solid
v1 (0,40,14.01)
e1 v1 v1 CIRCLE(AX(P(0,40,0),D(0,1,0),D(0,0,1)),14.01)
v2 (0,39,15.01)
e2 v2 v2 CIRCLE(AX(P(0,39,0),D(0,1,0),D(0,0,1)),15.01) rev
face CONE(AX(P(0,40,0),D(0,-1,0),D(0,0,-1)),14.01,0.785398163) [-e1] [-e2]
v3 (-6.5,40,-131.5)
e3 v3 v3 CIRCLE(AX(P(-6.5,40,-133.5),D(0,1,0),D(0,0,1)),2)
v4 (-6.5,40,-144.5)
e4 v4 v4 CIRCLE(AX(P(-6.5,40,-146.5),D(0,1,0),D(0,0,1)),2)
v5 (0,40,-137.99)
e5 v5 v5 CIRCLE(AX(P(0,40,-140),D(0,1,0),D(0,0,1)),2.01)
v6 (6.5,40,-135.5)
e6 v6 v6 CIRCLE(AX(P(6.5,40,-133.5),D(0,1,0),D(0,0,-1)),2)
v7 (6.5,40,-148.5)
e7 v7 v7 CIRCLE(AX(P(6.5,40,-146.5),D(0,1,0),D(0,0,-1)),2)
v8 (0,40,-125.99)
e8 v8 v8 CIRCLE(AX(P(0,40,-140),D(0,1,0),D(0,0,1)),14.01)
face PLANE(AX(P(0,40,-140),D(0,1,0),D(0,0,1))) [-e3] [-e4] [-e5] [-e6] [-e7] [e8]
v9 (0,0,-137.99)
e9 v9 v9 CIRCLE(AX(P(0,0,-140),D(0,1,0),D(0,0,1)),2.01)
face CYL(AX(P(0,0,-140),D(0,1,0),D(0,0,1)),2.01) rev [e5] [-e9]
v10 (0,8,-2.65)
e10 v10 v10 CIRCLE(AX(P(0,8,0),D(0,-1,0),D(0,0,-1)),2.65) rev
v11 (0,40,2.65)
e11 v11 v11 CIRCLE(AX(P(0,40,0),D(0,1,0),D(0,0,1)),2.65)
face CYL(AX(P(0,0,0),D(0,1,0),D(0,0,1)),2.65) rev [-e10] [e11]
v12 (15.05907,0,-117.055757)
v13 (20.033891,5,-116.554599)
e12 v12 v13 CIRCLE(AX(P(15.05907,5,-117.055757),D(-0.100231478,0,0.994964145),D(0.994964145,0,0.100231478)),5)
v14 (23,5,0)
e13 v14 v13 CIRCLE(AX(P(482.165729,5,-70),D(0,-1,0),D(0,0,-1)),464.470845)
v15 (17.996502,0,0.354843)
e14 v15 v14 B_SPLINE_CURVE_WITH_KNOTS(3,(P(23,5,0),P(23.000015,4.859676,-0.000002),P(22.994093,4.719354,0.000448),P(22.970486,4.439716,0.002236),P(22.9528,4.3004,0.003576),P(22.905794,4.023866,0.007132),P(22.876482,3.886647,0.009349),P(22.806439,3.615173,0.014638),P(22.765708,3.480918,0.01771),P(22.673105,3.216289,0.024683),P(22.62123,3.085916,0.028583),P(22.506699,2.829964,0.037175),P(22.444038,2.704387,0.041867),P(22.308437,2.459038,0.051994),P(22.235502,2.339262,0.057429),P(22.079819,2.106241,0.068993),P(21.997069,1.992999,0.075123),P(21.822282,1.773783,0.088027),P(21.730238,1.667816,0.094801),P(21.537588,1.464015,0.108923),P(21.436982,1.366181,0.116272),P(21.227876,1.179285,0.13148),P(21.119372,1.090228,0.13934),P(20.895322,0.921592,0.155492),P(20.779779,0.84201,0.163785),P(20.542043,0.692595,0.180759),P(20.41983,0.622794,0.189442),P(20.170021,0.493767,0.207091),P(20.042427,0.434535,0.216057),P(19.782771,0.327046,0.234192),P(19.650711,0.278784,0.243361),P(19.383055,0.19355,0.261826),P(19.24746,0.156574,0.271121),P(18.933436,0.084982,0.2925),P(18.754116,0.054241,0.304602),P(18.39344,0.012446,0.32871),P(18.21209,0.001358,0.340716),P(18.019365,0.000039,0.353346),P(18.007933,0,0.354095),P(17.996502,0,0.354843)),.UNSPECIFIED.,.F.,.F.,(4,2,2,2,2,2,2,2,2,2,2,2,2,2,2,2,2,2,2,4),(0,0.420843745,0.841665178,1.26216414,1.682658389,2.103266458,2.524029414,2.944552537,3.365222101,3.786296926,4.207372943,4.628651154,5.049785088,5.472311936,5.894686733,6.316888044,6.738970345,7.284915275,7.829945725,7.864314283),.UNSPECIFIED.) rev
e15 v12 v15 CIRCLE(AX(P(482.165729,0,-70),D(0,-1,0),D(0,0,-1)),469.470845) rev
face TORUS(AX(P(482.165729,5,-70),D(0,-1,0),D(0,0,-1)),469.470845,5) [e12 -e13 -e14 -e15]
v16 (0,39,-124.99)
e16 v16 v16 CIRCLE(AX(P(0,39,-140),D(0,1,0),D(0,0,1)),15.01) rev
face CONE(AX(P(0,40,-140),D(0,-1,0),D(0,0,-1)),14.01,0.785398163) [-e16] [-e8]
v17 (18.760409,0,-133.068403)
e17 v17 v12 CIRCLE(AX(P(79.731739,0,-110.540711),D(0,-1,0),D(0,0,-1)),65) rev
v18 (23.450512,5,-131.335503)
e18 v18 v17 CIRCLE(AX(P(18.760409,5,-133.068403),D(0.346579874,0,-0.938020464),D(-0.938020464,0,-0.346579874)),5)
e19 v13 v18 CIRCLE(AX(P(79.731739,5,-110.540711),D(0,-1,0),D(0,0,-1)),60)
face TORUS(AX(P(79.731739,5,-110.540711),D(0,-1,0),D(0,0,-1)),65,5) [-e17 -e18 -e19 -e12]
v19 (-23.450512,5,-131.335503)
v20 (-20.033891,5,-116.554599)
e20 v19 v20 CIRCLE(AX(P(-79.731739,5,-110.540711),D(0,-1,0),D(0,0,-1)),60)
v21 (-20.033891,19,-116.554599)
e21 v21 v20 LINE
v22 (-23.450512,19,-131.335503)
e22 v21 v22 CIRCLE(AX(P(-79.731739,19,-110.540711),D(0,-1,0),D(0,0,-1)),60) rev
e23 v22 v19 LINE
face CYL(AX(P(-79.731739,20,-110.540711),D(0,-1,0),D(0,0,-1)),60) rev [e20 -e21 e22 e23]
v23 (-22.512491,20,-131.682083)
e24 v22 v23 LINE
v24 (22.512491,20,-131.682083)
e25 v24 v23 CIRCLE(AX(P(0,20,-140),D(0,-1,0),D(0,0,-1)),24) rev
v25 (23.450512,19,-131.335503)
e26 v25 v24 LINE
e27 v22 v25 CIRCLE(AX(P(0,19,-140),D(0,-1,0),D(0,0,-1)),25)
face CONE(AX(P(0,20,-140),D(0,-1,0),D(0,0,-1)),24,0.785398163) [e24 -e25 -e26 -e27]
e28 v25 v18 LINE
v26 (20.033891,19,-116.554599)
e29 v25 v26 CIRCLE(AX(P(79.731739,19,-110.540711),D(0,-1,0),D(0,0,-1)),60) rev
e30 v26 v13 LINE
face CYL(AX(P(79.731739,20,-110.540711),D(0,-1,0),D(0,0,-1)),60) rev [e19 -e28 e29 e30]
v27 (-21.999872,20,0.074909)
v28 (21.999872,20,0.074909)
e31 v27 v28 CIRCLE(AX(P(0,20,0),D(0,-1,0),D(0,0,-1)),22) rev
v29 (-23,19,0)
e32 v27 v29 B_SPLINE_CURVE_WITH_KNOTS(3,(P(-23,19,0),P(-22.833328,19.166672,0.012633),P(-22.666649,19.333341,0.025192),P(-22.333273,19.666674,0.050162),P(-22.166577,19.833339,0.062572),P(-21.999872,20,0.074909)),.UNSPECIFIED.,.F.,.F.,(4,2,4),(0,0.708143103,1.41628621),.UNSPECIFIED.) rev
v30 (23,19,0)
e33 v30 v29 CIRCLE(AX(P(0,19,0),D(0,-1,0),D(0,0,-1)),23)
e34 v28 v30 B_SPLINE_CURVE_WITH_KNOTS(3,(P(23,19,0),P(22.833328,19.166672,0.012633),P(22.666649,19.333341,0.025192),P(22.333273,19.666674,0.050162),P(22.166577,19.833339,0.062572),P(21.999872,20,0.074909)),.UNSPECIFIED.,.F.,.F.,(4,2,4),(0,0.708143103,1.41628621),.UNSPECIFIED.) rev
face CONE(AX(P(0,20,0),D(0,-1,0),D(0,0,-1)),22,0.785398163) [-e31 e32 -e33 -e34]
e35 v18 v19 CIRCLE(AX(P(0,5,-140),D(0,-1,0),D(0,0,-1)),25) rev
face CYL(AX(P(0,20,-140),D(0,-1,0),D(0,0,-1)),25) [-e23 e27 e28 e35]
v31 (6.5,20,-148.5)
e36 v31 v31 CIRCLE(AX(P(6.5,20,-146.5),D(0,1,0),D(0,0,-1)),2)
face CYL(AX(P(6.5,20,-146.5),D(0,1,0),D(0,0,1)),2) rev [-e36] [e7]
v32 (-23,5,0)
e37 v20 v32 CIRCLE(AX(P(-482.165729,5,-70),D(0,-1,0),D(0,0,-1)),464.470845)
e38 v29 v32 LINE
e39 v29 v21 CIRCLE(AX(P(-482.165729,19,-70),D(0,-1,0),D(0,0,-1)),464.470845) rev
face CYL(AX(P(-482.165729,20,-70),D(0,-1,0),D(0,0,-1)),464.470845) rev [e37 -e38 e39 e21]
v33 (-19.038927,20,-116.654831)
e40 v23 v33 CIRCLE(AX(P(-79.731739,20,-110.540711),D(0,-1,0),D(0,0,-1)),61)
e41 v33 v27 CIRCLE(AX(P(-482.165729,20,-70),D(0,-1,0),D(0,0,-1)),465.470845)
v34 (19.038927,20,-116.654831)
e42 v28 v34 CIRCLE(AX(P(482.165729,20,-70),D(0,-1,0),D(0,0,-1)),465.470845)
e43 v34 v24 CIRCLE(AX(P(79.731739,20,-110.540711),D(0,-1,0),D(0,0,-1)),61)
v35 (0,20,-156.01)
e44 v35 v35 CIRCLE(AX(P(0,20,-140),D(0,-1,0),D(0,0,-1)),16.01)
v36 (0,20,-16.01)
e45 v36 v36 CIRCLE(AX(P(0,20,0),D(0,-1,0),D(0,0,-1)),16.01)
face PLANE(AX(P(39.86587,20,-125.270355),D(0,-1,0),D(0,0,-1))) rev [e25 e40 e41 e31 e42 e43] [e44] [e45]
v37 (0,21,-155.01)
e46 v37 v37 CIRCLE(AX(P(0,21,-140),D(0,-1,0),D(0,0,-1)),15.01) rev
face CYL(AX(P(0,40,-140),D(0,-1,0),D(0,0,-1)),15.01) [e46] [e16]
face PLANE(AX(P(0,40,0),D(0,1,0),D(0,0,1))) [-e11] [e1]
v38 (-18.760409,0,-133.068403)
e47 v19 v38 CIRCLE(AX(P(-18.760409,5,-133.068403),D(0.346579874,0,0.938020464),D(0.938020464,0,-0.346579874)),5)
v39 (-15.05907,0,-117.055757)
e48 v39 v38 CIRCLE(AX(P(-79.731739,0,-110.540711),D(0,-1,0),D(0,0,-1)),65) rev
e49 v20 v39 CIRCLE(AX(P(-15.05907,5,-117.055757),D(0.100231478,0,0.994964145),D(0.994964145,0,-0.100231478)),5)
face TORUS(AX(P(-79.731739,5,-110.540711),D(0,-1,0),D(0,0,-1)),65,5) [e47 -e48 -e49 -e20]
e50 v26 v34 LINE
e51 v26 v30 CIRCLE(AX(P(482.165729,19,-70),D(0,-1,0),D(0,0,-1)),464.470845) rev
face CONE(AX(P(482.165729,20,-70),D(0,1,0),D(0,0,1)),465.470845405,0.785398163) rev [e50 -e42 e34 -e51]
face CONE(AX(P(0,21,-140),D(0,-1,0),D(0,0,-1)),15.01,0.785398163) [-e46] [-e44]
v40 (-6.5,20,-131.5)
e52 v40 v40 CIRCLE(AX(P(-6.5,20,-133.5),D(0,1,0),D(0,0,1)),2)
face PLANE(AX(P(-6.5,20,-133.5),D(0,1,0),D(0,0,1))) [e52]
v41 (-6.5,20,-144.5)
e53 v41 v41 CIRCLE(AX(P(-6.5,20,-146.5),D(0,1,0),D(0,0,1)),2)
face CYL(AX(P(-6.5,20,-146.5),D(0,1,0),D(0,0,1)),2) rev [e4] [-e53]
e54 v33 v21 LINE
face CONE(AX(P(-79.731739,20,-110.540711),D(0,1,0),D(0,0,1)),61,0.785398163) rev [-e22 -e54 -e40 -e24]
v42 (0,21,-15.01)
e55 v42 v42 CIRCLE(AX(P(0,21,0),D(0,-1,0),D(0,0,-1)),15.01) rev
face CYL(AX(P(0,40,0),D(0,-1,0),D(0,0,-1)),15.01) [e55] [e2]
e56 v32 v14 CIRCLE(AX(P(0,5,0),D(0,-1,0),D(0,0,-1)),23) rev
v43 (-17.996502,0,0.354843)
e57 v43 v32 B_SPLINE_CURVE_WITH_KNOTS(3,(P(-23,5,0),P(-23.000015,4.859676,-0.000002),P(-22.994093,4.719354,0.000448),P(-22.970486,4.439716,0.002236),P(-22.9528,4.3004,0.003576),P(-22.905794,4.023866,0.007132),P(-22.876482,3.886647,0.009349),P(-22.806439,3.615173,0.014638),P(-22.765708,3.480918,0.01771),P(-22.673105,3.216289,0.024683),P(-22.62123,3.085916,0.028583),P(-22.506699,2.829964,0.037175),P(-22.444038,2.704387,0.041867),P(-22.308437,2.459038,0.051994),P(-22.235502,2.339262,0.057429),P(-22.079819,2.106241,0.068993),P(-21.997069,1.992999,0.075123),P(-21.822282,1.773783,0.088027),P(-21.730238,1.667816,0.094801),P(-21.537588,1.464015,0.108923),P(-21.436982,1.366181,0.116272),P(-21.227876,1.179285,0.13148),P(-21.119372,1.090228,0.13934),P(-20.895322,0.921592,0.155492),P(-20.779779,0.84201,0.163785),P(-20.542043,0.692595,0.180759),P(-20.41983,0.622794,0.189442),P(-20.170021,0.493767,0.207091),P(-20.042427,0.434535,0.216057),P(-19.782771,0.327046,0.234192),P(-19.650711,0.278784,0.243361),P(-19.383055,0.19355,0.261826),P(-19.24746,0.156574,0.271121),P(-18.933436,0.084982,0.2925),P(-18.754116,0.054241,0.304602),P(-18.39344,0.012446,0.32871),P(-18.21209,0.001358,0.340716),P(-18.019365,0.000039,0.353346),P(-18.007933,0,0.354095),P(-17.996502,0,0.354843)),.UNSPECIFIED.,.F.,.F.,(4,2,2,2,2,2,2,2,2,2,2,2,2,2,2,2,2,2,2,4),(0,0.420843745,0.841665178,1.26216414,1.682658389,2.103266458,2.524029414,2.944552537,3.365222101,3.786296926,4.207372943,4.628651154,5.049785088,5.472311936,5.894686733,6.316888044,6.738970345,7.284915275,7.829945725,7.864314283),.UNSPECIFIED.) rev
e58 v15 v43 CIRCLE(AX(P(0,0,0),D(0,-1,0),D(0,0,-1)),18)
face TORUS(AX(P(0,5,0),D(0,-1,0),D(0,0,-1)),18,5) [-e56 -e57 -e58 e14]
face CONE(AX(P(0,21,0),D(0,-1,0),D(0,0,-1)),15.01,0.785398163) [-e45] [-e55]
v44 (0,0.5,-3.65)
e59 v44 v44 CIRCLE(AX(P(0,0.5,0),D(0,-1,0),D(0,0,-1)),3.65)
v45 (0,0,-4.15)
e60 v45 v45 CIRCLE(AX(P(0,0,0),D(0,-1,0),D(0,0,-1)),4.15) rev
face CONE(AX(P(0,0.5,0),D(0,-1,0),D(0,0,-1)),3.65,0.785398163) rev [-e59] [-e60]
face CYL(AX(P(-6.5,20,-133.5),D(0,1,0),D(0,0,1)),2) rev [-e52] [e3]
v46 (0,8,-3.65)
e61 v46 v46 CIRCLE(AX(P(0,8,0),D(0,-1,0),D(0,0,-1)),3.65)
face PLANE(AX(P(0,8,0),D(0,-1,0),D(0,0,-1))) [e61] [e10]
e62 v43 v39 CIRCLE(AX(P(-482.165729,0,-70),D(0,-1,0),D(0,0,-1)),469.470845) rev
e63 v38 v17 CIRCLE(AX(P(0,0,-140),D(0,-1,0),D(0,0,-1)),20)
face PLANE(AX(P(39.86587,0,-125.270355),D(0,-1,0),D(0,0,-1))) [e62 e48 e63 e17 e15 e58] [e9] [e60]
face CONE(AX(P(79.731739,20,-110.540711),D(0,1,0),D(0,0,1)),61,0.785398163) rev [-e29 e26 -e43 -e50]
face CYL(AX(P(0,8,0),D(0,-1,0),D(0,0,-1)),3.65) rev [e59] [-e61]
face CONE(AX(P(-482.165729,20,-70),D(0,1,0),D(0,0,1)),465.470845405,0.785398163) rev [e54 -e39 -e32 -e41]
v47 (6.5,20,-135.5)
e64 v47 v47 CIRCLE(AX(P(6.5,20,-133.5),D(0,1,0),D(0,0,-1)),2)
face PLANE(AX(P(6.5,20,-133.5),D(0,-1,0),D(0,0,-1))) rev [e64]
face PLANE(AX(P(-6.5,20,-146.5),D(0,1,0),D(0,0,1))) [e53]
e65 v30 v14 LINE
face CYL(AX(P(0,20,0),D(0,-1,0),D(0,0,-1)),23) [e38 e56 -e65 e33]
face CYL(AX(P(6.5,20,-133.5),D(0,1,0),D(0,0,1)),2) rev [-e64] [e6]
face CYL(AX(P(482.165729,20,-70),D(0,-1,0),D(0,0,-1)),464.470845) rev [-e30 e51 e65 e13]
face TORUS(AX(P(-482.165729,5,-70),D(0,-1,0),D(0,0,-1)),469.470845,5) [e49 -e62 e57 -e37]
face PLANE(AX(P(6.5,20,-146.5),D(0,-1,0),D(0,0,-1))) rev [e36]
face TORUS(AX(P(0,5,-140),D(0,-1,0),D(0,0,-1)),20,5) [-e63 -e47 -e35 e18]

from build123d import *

# Parameters (mm, degrees)
BOSS_EXTRUDE1_DEPTH = 20
SKETCH2_R           = 15.01
BOSS_EXTRUDE2_DEPTH = 20
CHAMFER1_SIZE       = 1
CHAMFER3_SIZE       = 1
SKETCH5_R           = 2.65
CUT_EXTRUDE2_DEPTH  = 40
FILLET3_R           = 5
SKETCH6_R           = 3.65
CUT_EXTRUDE3_DEPTH  = 8
CHAMFER4_SIZE       = 0.5
SKETCH10_R          = 15.01
BOSS_EXTRUDE5_DEPTH = 20
CHAMFER5_SIZE       = 1
SKETCH11_R          = 2.0099999999999967
CUT_EXTRUDE5_DEPTH  = 40
SKETCH12_R          = 2.0000000000000018
SKETCH12_R_2        = 2.000000000000005
SKETCH12_R_3        = 1.9999999999999967
CUT_EXTRUDE6_DEPTH  = 19.999999999999996


with BuildPart() as part:
    # Sketch1 → Boss-Extrude1 (new body)
    with BuildSketch(Plane(origin=(0, 0, 0), x_dir=(1, 0, 0), z_dir=(0, 1, 0))):
        with BuildLine():
            ThreePointArc((-23, 0), (1.41e-15, -22.999999999999982), (23, 0))
            ThreePointArc((23, 0), (17.845208734768505, 58.18386045047181), (20.033890701411753, 116.55459936267802))
            ThreePointArc((20.033890701411753, 116.55459936267802), (21.27316153822275, 124.05347023326534), (23.45051159720983, 131.33550314045155))
            ThreePointArc((23.45051159720983, 131.33550314045155), (-2.067e-14, 165.00000000000006), (-23.45051159720983, 131.3355031404515))
            ThreePointArc((-23.45051159720983, 131.3355031404515), (-21.27316153822273, 124.05347023326526), (-20.033890701411725, 116.55459936267786))
            ThreePointArc((-20.033890701411725, 116.55459936267786), (-17.845208734768505, 58.1838604504716), (-23, 0))
        make_face()
    extrude(amount=BOSS_EXTRUDE1_DEPTH)

    # Sketch2 → Boss-Extrude2 (add)
    with BuildSketch(Plane(origin=(0, 20, 0), x_dir=(1, 0, 0), z_dir=(0, 1, 0))):
        with Locations(Location((0, 0, 0), (0, 0, 90))):
            Circle(SKETCH2_R)
    extrude(amount=BOSS_EXTRUDE2_DEPTH)

    # Chamfer1
    chamfer1_edges = [part.edges().sort_by_distance(p)[0] for p in [
        (-2.76e-15, 40, 15.01),
    ]]
    chamfer(chamfer1_edges, length=CHAMFER1_SIZE)

    # Chamfer3
    # the kernel refuses this chamfer: 1 mm, written as the material it adds along each edge
    with BuildSketch(Plane(origin=(0, 20, 0), x_dir=(6e-17, 0, -1), z_dir=(1, 0, 6e-17))) as chamfer3_piece_1:
        Polygon((15.01, CHAMFER3_SIZE), (15.01 + CHAMFER3_SIZE, 0), (15.01, 0), align=None)
    revolve(axis=Axis((0, 20, 0), (0, 1, 0)))
    # the kernel refuses this chamfer: 1 mm, written as the material it takes off along each edge
    with BuildSketch(Plane(origin=(-79.73173943051358, 20, -110.54071067753486), x_dir=(0.9380204638883933, 0, -0.3465798743819428), z_dir=(-0.3465798743819428, 0, -0.9380204638883933))) as chamfer3_2_piece_1:
        Polygon((60.00000000000017 + CHAMFER3_SIZE, 0), (60.00000000000017, CHAMFER3_SIZE), (60.00000000000017, 0), align=None)
    revolve(axis=Axis((-79.73173943051358, 20, -110.54071067753486), (0, -1, 0)), revolution_arc=14.525766875036835, mode=Mode.SUBTRACT)
    with BuildSketch(Plane(origin=(-482.16572850262514, 20, -70.00000000000004), x_dir=(0.9949641454850282, 0, -0.1002314780857173), z_dir=(-0.1002314780857173, 0, -0.9949641454850282))) as chamfer3_2_piece_2:
        Polygon((464.4708454051196 + CHAMFER3_SIZE, 0), (464.4708454051196, CHAMFER3_SIZE), (464.4708454051196, 0), align=None)
    revolve(axis=Axis((-482.16572850262514, 20, -70.00000000000004), (0, -1, 0)), revolution_arc=14.737763084908373, mode=Mode.SUBTRACT)
    with BuildSketch(Plane(origin=(0, 20, -1.599e-14), x_dir=(-0.9937354343699007, 0, -0.11175816067592001), z_dir=(0.11175816067592001, 0, -0.9937354343699007))) as chamfer3_2_piece_3:
        Polygon((23.000000000000004 - CHAMFER3_SIZE, 0), (23.000000000000004, -CHAMFER3_SIZE), (23.000000000000004, 0), align=None)
    revolve(axis=Axis((0, 20, -1.599e-14), (0, 1, 0)), revolution_arc=192.83335153216495, mode=Mode.SUBTRACT)
    with BuildSketch(Plane(origin=(482.16572850261997, 20, -69.99999999999986), x_dir=(-0.9877285445231084, 0, 0.15618041597544133), z_dir=(0.15618041597544133, 0, 0.9877285445231084))) as chamfer3_2_piece_4:
        Polygon((464.4708454051149 + CHAMFER3_SIZE, 0), (464.47084540511446, CHAMFER3_SIZE), (464.4708454051149, 0), align=None)
    revolve(axis=Axis((482.16572850261997, 20, -69.99999999999986), (0, -1, 0)), revolution_arc=14.737763084908554, mode=Mode.SUBTRACT)
    with BuildSketch(Plane(origin=(79.7317394305139, 20, -110.54071067753493), x_dir=(-0.9949641454850281, 0, -0.10023147808571735), z_dir=(-0.10023147808571735, 0, 0.9949641454850281))) as chamfer3_2_piece_5:
        Polygon((60.000000000000455 + CHAMFER3_SIZE, 0), (60.000000000000455, CHAMFER3_SIZE), (60.000000000000455, 0), align=None)
    revolve(axis=Axis((79.7317394305139, 20, -110.54071067753493), (0, -1, 0)), revolution_arc=14.525766875036666, mode=Mode.SUBTRACT)
    with BuildSketch(Plane(origin=(9.77e-15, 20, -140.00000000000006), x_dir=(0.9380204638883942, 0, 0.3465798743819405), z_dir=(-0.3465798743819405, 0, 0.9380204638883942))) as chamfer3_2_piece_6:
        Polygon((24.999999999999982 - CHAMFER3_SIZE, 0), (24.999999999999982, -CHAMFER3_SIZE), (24.999999999999982, 0), align=None)
    revolve(axis=Axis((9.77e-15, 20, -140.00000000000006), (0, 1, 0)), revolution_arc=220.55653408148345, mode=Mode.SUBTRACT)

    # Sketch5 → Cut-Extrude2 (cut)
    with BuildSketch(Plane(origin=(0, 40, 0), x_dir=(1, 0, 0), z_dir=(0, 1, 0))):
        with Locations(Location((0, 0, 0), (0, 0, 270))):
            Circle(SKETCH5_R)
    extrude(amount=-CUT_EXTRUDE2_DEPTH, mode=Mode.SUBTRACT)

    # Fillet3
    # the kernel refuses this fillet: 5 mm, written as the material it takes off along each edge
    with BuildSketch(Plane(origin=(482.16572850261997, 0, -69.99999999999986), x_dir=(-0.9868985080370148, 0, 0.1613422909045059), z_dir=(0.1613422909045059, 0, 0.9868985080370148))) as fillet3_piece_1:
        with BuildLine():
            CenterArc((464.4708454051144 + FILLET3_R, -FILLET3_R), FILLET3_R, 89.99999999999935, 90.00000000000068)
            Line((464.4708454051144 + FILLET3_R, 8.9e-16), (464.4708454051144 + FILLET3_R, FILLET3_R * 0.02))
            Line((464.4708454051144 + FILLET3_R, FILLET3_R * 0.02), (464.4708454051144 - FILLET3_R * 0.02, FILLET3_R * 0.02))
            Line((464.4708454051144 - FILLET3_R * 0.02, FILLET3_R * 0.02), (464.4708454051144 - FILLET3_R * 0.02, -FILLET3_R))
            Line((464.4708454051144 - FILLET3_R * 0.02, -FILLET3_R), (464.4708454051144, -FILLET3_R))
        make_face()
    revolve(axis=Axis((482.16572850261997, 0, -69.99999999999986), (0, -1, 0)), revolution_arc=15.03731633345655, mode=Mode.SUBTRACT)
    with BuildSketch(Plane(origin=(0, 0, -1.599e-14), x_dir=(-0.9763879588864252, 0, -0.21602442857603077), z_dir=(0.21602442857603077, 0, -0.9763879588864252))) as fillet3_piece_2:
        with BuildLine():
            CenterArc((23 - FILLET3_R, FILLET3_R), FILLET3_R, 269.99999999999994, 90.00000000000006)
            Line((23 - FILLET3_R, -8.9e-16), (23 - FILLET3_R, -FILLET3_R * 0.02))
            Line((23 - FILLET3_R, -FILLET3_R * 0.02), (23 + FILLET3_R * 0.02, -FILLET3_R * 0.02))
            Line((23 + FILLET3_R * 0.02, -FILLET3_R * 0.02), (23 + FILLET3_R * 0.02, FILLET3_R))
            Line((23 + FILLET3_R * 0.02, FILLET3_R), (23.000000000000004, FILLET3_R))
        make_face()
    revolve(axis=Axis((0, 0, -1.599e-14), (0, 1, 0)), revolution_arc=204.95127041750123, mode=Mode.SUBTRACT)
    with BuildSketch(Plane(origin=(-482.16572850262514, 0, -70.00000000000004), x_dir=(0.9949641454850282, 0, -0.1002314780857173), z_dir=(-0.1002314780857173, 0, -0.9949641454850282))) as fillet3_piece_3:
        with BuildLine():
            CenterArc((464.4708454051196 + FILLET3_R, -FILLET3_R), FILLET3_R, 90, 90)
            Line((464.4708454051196 + FILLET3_R, 8.9e-16), (464.4708454051196 + FILLET3_R, FILLET3_R * 0.02))
            Line((464.4708454051196 + FILLET3_R, FILLET3_R * 0.02), (464.4708454051196 - FILLET3_R * 0.02, FILLET3_R * 0.02))
            Line((464.4708454051196 - FILLET3_R * 0.02, FILLET3_R * 0.02), (464.4708454051196 - FILLET3_R * 0.02, -FILLET3_R))
            Line((464.4708454051196 - FILLET3_R * 0.02, -FILLET3_R), (464.4708454051196, -FILLET3_R))
        make_face()
    revolve(axis=Axis((-482.16572850262514, 0, -70.00000000000004), (0, -1, 0)), revolution_arc=15.037316333456364, mode=Mode.SUBTRACT)
    with BuildSketch(Plane(origin=(-79.73173943051358, 0, -110.54071067753486), x_dir=(0.9380204638883933, 0, -0.3465798743819428), z_dir=(-0.3465798743819428, 0, -0.9380204638883933))) as fillet3_piece_4:
        with BuildLine():
            CenterArc((60.00000000000017 + FILLET3_R, -FILLET3_R), FILLET3_R, 90, 90)
            Line((60.00000000000017 + FILLET3_R, 8.9e-16), (60.00000000000017 + FILLET3_R, FILLET3_R * 0.02))
            Line((60.00000000000017 + FILLET3_R, FILLET3_R * 0.02), (60.00000000000017 - FILLET3_R * 0.02, FILLET3_R * 0.02))
            Line((60.00000000000017 - FILLET3_R * 0.02, FILLET3_R * 0.02), (60.00000000000017 - FILLET3_R * 0.02, -FILLET3_R))
            Line((60.00000000000017 - FILLET3_R * 0.02, -FILLET3_R), (60.00000000000018, -FILLET3_R))
        make_face()
    revolve(axis=Axis((-79.73173943051358, 0, -110.54071067753486), (0, -1, 0)), revolution_arc=14.525766875036835, mode=Mode.SUBTRACT)
    with BuildSketch(Plane(origin=(9.77e-15, 0, -140.00000000000006), x_dir=(0.9380204638883942, 0, 0.3465798743819405), z_dir=(-0.3465798743819405, 0, 0.9380204638883942))) as fillet3_piece_5:
        with BuildLine():
            CenterArc((24.999999999999982 - FILLET3_R, FILLET3_R), FILLET3_R, 270, 90)
            Line((24.999999999999982 - FILLET3_R, -8.9e-16), (24.999999999999982 - FILLET3_R, -FILLET3_R * 0.02))
            Line((24.999999999999982 - FILLET3_R, -FILLET3_R * 0.02), (24.999999999999982 + FILLET3_R * 0.02, -FILLET3_R * 0.02))
            Line((24.999999999999982 + FILLET3_R * 0.02, -FILLET3_R * 0.02), (24.999999999999982 + FILLET3_R * 0.02, FILLET3_R))
            Line((24.999999999999982 + FILLET3_R * 0.02, FILLET3_R), (24.999999999999986, FILLET3_R))
        make_face()
    revolve(axis=Axis((9.77e-15, 0, -140.00000000000006), (0, 1, 0)), revolution_arc=220.55653408148345, mode=Mode.SUBTRACT)
    with BuildSketch(Plane(origin=(79.7317394305139, 0, -110.54071067753493), x_dir=(-0.9949641454850281, 0, -0.10023147808571735), z_dir=(-0.10023147808571735, 0, 0.9949641454850281))) as fillet3_piece_6:
        with BuildLine():
            CenterArc((60.000000000000455 + FILLET3_R, -FILLET3_R), FILLET3_R, 90, 90)
            Line((60.000000000000455 + FILLET3_R, 8.9e-16), (60.000000000000455 + FILLET3_R, FILLET3_R * 0.02))
            Line((60.000000000000455 + FILLET3_R, FILLET3_R * 0.02), (60.000000000000455 - FILLET3_R * 0.02, FILLET3_R * 0.02))
            Line((60.000000000000455 - FILLET3_R * 0.02, FILLET3_R * 0.02), (60.000000000000455 - FILLET3_R * 0.02, -FILLET3_R))
            Line((60.000000000000455 - FILLET3_R * 0.02, -FILLET3_R), (60.000000000000455, -FILLET3_R))
        make_face()
    revolve(axis=Axis((79.7317394305139, 0, -110.54071067753493), (0, -1, 0)), revolution_arc=14.525766875036666, mode=Mode.SUBTRACT)

    # Sketch6 → Cut-Extrude3 (cut)
    with BuildSketch(Plane.XZ):
        with Locations(Location((0, 0, 0), (0, 0, 270))):
            Circle(SKETCH6_R)
    extrude(amount=-CUT_EXTRUDE3_DEPTH, mode=Mode.SUBTRACT)

    # Chamfer4
    chamfer4_edges = [part.edges().sort_by_distance(p)[0] for p in [
        (1.12e-15, 0, 3.65),
    ]]
    chamfer(chamfer4_edges, length=CHAMFER4_SIZE)

    # Sketch10 → Boss-Extrude5 (add)
    with BuildSketch(Plane(origin=(0, 20, 0), x_dir=(1, 0, 0), z_dir=(0, 1, 0))):
        with Locations(Location((0, 140.00000000000009, 0), (0, 0, 90))):
            Circle(SKETCH10_R)
    extrude(amount=BOSS_EXTRUDE5_DEPTH)

    # Chamfer5
    chamfer5_edges = [part.edges().sort_by_distance(p)[0] for p in [
        (-2.76e-15, 20, -124.99000000000008),
        (-2.76e-15, 40, -124.99000000000008),
    ]]
    chamfer(chamfer5_edges, length=CHAMFER5_SIZE)

    # Sketch11 → Cut-Extrude5 (cut)
    with BuildSketch(Plane(origin=(0, 40, 0), x_dir=(1, 0, 0), z_dir=(0, 1, 0))):
        with Locations(Location((0, 140.00000000000009, 0), (0, 0, 270))):
            Circle(SKETCH11_R)
    extrude(amount=-CUT_EXTRUDE5_DEPTH, mode=Mode.SUBTRACT)

    # Sketch12 → Cut-Extrude6 (cut)
    with BuildSketch(Plane(origin=(0, 40, 0), x_dir=(1, 0, 0), z_dir=(0, 1, 0))):
        with Locations(Location((-6.500000000000021, 146.50000000000014, 0), (0, 0, 270))):
            Circle(SKETCH12_R)
        with Locations(Location((-6.4999999999999885, 133.5000000000001, 0), (0, 0, 270))):
            Circle(SKETCH12_R)
        with Locations(Location((6.500000000000011, 133.50000000000009, 0), (0, 0, 90))):
            Circle(SKETCH12_R_2)
        with Locations(Location((6.499999999999978, 146.5000000000001, 0), (0, 0, 90))):
            Circle(SKETCH12_R_3)
    extrude(amount=-CUT_EXTRUDE6_DEPTH, mode=Mode.SUBTRACT)


solid = part.part
